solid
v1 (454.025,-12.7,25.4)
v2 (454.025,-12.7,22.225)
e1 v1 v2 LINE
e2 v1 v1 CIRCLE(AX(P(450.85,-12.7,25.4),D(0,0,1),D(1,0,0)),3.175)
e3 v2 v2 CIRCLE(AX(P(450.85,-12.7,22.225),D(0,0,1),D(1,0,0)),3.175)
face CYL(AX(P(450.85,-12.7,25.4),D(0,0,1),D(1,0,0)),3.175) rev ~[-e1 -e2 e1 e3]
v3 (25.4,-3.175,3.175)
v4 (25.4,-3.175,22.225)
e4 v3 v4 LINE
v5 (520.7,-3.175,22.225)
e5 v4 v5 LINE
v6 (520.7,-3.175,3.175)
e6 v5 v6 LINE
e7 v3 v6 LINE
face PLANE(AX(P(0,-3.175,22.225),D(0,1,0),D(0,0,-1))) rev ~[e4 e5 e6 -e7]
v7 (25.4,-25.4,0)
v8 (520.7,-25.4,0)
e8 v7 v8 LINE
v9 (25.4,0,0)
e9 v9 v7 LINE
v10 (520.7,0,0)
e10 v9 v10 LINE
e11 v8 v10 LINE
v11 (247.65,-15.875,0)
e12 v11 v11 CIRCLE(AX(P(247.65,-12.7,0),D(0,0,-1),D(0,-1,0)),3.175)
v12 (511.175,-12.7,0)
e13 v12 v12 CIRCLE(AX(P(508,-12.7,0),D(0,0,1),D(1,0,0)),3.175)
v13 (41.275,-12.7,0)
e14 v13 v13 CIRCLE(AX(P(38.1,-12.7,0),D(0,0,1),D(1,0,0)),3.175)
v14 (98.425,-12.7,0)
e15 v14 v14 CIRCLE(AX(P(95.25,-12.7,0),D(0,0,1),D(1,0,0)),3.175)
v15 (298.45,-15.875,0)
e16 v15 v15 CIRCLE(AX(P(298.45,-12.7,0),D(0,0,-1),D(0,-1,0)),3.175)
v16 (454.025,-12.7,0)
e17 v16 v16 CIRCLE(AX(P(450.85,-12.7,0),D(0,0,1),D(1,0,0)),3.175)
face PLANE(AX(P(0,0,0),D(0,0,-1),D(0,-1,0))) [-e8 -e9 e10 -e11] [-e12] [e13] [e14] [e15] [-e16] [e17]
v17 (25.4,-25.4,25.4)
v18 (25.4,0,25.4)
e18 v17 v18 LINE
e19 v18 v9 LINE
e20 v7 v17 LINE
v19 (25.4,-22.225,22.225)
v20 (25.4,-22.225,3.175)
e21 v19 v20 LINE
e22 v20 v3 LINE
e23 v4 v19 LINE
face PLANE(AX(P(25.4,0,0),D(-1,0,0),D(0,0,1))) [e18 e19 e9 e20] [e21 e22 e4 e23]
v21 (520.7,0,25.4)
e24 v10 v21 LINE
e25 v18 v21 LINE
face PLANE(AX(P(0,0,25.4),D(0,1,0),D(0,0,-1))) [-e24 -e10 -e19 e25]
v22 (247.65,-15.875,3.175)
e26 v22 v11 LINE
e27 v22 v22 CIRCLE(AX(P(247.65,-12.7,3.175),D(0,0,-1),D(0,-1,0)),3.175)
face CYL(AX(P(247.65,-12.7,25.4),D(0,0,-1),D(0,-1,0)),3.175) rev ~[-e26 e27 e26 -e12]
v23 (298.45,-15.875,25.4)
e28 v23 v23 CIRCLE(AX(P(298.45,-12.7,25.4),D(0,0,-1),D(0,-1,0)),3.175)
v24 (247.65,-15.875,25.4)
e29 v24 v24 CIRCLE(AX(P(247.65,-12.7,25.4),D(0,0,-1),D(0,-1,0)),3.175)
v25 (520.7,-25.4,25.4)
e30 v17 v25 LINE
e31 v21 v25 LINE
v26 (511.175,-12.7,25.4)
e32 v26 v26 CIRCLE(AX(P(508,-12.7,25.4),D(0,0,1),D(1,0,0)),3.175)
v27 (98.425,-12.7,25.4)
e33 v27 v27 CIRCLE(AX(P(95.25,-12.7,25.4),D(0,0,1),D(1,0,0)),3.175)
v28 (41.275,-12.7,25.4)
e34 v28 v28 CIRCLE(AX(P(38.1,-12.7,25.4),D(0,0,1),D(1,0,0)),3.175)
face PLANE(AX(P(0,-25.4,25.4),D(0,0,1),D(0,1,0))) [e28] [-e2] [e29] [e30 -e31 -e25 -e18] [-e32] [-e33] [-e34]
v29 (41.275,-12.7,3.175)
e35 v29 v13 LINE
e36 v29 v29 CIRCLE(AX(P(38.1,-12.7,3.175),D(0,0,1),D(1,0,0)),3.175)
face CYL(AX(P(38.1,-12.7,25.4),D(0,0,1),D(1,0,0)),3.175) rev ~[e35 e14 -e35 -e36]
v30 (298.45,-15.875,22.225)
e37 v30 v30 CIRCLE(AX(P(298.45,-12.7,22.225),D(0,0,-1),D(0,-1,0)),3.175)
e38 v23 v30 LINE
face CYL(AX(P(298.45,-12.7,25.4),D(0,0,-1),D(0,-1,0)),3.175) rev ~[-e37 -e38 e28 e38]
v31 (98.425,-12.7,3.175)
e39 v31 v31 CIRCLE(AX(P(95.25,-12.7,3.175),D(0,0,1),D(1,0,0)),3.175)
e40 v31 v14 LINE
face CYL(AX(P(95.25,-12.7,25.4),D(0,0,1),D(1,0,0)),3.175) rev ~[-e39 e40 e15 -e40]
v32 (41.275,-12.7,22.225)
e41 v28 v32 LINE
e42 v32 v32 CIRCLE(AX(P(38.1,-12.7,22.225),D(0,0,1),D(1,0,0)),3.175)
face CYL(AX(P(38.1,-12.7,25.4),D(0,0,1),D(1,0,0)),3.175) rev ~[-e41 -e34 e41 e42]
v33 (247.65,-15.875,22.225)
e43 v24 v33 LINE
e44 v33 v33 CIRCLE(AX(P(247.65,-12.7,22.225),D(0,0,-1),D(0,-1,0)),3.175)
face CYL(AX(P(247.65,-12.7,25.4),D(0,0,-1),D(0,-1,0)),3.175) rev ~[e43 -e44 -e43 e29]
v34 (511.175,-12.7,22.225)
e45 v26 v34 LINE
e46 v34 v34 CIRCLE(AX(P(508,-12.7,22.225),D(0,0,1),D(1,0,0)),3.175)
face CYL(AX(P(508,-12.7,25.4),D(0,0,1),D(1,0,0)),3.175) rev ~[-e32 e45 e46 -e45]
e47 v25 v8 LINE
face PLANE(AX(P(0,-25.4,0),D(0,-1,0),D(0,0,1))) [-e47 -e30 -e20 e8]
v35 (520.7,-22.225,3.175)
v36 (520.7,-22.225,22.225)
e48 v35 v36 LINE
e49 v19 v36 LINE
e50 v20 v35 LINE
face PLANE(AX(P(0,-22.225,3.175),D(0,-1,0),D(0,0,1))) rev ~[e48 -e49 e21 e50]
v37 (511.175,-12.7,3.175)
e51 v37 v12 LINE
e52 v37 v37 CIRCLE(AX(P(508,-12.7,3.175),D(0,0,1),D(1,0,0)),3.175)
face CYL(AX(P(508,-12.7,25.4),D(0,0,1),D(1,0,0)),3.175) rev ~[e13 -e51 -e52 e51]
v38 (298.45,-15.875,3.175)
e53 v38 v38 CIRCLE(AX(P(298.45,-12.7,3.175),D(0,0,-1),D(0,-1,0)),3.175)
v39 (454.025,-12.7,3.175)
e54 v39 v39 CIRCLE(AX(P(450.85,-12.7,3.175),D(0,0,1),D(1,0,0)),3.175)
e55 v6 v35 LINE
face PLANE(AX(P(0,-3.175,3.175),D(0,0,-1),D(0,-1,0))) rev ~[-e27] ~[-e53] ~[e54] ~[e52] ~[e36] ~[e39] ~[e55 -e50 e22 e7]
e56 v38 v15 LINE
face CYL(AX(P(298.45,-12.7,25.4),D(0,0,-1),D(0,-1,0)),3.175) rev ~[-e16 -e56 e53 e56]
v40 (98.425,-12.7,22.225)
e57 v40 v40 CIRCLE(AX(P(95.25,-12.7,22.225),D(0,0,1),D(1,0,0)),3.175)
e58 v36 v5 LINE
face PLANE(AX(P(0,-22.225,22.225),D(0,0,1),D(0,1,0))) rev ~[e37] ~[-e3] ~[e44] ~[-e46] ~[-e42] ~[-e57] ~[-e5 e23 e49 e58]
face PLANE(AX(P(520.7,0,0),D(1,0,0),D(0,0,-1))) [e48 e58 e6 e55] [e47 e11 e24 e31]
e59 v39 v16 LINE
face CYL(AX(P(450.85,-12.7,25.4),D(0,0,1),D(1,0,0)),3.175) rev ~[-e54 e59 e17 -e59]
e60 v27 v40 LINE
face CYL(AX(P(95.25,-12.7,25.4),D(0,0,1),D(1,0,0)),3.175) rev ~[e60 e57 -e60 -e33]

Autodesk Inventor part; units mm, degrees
ref_plane "YZ Plane" through (0, 0, 0) normal (1, 0, 0) x (0, 1, 0)
ref_plane "XZ Plane" through (0, 0, 0) normal (0, 1, 0) x (-1, 0, 0)
ref_plane "XY Plane" through (0, 0, 0) normal (0, 0, 1) x (1, 0, 0)
sketch "Sketch1" plane through (0, 0, 0) normal (1, 0, 0) x (0, 1, 0)
  line L0 (0, 0) -> (-25.4, 0)
  line L1 (-25.4, 0) -> (-25.4, 25.4)
  line L2 (-25.4, 25.4) -> (0, 25.4)
  line L3 (0, 25.4) -> (0, 0)
  line L4 (-3.175, 3.175) -> (-22.225, 3.175)
  line L5 (-22.225, 3.175) -> (-22.225, 22.225)
  line L6 (-22.225, 22.225) -> (-3.175, 22.225)
  line L7 (-3.175, 22.225) -> (-3.175, 3.175)
  dimension "d0" = 25.4
  dimension "d1" = 25.4
  dimension "d2" = 19.05
  dimension "d3" = 19.05
  dimension "d4" = 3.175
  dimension "d5" = 3.175
extrude "Extrusion1" add sketch "Sketch1" along normal blind 546.1
sketch "Sketch2" plane through (0, -25.4, 25.4) normal (0, 0, 1) x (1, 0, 0)
  line L0 (0, 0) -> (0, 25.4) projected
  line L1 (0, 0) -> (546.1, 0) projected
  line L2 (546.1, 25.4) -> (546.1, 0) projected
  line L3 (0, 25.4) -> (546.1, 25.4) projected
  point P0 (12.7, 12.7)
  point P1 (533.4, 12.7)
  dimension "d8" = 12.7
  dimension "d9" = 12.7
  dimension "d10" = 12.7
  dimension "d11" = 12.7
hole "Hole1" at (12.7, -12.7, 25.4) at (533.4, -12.7, 25.4) direction (0, 0, -1) diameter 6.35 end through all
sketch "Sketch3" plane through (0, -25.4, 25.4) normal (0, 0, 1) x (1, 0, 0)
  circle A0 centre (12.7, 12.7) radius 3.175 projected
  circle A1 centre (533.4, 12.7) radius 3.175 projected
  line L0 (0, 0) -> (0, 25.4) projected
  line L1 (0, 0) -> (546.1, 0) projected
  line L2 (546.1, 25.4) -> (546.1, 0) projected
  line L3 (0, 25.4) -> (546.1, 25.4) projected
  point P0 (247.65, 12.7)
  point P1 (298.45, 12.7)
  dimension "d19" = 247.65
  dimension "d20" = 247.65
  dimension "d21" = 12.7
  dimension "d22" = 12.7
hole "Hole2" at (247.65, -12.7, 25.4) at (298.45, -12.7, 25.4) direction (0, 0, -1) diameter 6.35 end through all
sketch "Sketch4" plane through (0, -25.4, 25.4) normal (0, 0, 1) x (1, 0, 0)
  circle A0 centre (247.65, 12.7) radius 3.175 projected
  circle A1 centre (298.45, 12.7) radius 3.175 projected
  circle A2 centre (12.7, 12.7) radius 3.175 projected
  circle A3 centre (533.4, 12.7) radius 3.175 projected
  line L0 (0, 0) -> (0, 25.4) projected
  line L1 (0, 0) -> (546.1, 0) projected
  line L2 (546.1, 25.4) -> (546.1, 0) projected
  line L3 (0, 25.4) -> (546.1, 25.4) projected
  point P0 (38.1, 12.7)
  point P1 (508, 12.7)
  dimension "d30" = 38.1
  dimension "d31" = 12.7
  dimension "d32" = 12.7
  dimension "d33" = 38.1
hole "Hole3" at (38.1, -12.7, 25.4) at (508, -12.7, 25.4) direction (0, 0, -1) diameter 4.7625 end through all
sketch "Sketch7" plane through (0, -25.4, 25.4) normal (0, 0, 1) x (1, 0, 0)
  circle A0 centre (38.1, 12.7) radius 2.3813 projected
  circle A1 centre (508, 12.7) radius 2.3813 projected
  line L0 (0, 0) -> (546.1, 0) projected
  circle A2 centre (38.1, 12.7) radius 3.175
  circle A3 centre (95.25, 12.7) radius 3.175
  circle A4 centre (508, 12.7) radius 2.3813 projected
  circle A5 centre (508, 12.7) radius 3.175
  circle A6 centre (450.85, 12.7) radius 3.175
  dimension "d65" = 6.35
  dimension "d66" = 6.35
  dimension "d67" = 12.7
  dimension "d68" = 57.15
  dimension "d69" = 6.35
  dimension "d70" = 6.35
  dimension "d71" = 12.7
  dimension "d72" = 57.15
extrude "Extrusion2" cut sketch "Sketch7" against normal blind 25.4
sketch "Sketch8" plane through (0, 0, 0) normal (-1, 0, 0) x (0, 0, 1)
  line L0 (22.225, -22.225) -> (3.175, -22.225) projected
  line L1 (3.175, -22.225) -> (3.175, -3.175) projected
  line L2 (3.175, -3.175) -> (22.225, -3.175) projected
  line L3 (22.225, -3.175) -> (22.225, -22.225) projected
  line L4 (0, 0) -> (0, -25.4) projected
  line L5 (0, -25.4) -> (25.4, -25.4) projected
  line L6 (25.4, -25.4) -> (25.4, 0) projected
  line L7 (25.4, 0) -> (0, 0) projected
extrude "Extrusion3" cut sketch "Sketch8" against normal blind 25.4
sketch "Sketch9" plane through (546.1, 0, 0) normal (1, 0, 0) x (0, 0, -1)
  line L0 (-3.175, -22.225) -> (-22.225, -22.225) projected
  line L1 (-22.225, -22.225) -> (-22.225, -3.175) projected
  line L2 (-22.225, -3.175) -> (-3.175, -3.175) projected
  line L3 (-3.175, -3.175) -> (-3.175, -22.225) projected
  line L4 (0, -25.4) -> (0, 0) projected
  line L5 (0, 0) -> (-25.4, 0) projected
  line L6 (-25.4, 0) -> (-25.4, -25.4) projected
  line L7 (-25.4, -25.4) -> (0, -25.4) projected
extrude "Extrusion4" cut sketch "Sketch9" against normal blind 25.4
properties part number "1x1 horizontal support" material "Aluminum 6061"
